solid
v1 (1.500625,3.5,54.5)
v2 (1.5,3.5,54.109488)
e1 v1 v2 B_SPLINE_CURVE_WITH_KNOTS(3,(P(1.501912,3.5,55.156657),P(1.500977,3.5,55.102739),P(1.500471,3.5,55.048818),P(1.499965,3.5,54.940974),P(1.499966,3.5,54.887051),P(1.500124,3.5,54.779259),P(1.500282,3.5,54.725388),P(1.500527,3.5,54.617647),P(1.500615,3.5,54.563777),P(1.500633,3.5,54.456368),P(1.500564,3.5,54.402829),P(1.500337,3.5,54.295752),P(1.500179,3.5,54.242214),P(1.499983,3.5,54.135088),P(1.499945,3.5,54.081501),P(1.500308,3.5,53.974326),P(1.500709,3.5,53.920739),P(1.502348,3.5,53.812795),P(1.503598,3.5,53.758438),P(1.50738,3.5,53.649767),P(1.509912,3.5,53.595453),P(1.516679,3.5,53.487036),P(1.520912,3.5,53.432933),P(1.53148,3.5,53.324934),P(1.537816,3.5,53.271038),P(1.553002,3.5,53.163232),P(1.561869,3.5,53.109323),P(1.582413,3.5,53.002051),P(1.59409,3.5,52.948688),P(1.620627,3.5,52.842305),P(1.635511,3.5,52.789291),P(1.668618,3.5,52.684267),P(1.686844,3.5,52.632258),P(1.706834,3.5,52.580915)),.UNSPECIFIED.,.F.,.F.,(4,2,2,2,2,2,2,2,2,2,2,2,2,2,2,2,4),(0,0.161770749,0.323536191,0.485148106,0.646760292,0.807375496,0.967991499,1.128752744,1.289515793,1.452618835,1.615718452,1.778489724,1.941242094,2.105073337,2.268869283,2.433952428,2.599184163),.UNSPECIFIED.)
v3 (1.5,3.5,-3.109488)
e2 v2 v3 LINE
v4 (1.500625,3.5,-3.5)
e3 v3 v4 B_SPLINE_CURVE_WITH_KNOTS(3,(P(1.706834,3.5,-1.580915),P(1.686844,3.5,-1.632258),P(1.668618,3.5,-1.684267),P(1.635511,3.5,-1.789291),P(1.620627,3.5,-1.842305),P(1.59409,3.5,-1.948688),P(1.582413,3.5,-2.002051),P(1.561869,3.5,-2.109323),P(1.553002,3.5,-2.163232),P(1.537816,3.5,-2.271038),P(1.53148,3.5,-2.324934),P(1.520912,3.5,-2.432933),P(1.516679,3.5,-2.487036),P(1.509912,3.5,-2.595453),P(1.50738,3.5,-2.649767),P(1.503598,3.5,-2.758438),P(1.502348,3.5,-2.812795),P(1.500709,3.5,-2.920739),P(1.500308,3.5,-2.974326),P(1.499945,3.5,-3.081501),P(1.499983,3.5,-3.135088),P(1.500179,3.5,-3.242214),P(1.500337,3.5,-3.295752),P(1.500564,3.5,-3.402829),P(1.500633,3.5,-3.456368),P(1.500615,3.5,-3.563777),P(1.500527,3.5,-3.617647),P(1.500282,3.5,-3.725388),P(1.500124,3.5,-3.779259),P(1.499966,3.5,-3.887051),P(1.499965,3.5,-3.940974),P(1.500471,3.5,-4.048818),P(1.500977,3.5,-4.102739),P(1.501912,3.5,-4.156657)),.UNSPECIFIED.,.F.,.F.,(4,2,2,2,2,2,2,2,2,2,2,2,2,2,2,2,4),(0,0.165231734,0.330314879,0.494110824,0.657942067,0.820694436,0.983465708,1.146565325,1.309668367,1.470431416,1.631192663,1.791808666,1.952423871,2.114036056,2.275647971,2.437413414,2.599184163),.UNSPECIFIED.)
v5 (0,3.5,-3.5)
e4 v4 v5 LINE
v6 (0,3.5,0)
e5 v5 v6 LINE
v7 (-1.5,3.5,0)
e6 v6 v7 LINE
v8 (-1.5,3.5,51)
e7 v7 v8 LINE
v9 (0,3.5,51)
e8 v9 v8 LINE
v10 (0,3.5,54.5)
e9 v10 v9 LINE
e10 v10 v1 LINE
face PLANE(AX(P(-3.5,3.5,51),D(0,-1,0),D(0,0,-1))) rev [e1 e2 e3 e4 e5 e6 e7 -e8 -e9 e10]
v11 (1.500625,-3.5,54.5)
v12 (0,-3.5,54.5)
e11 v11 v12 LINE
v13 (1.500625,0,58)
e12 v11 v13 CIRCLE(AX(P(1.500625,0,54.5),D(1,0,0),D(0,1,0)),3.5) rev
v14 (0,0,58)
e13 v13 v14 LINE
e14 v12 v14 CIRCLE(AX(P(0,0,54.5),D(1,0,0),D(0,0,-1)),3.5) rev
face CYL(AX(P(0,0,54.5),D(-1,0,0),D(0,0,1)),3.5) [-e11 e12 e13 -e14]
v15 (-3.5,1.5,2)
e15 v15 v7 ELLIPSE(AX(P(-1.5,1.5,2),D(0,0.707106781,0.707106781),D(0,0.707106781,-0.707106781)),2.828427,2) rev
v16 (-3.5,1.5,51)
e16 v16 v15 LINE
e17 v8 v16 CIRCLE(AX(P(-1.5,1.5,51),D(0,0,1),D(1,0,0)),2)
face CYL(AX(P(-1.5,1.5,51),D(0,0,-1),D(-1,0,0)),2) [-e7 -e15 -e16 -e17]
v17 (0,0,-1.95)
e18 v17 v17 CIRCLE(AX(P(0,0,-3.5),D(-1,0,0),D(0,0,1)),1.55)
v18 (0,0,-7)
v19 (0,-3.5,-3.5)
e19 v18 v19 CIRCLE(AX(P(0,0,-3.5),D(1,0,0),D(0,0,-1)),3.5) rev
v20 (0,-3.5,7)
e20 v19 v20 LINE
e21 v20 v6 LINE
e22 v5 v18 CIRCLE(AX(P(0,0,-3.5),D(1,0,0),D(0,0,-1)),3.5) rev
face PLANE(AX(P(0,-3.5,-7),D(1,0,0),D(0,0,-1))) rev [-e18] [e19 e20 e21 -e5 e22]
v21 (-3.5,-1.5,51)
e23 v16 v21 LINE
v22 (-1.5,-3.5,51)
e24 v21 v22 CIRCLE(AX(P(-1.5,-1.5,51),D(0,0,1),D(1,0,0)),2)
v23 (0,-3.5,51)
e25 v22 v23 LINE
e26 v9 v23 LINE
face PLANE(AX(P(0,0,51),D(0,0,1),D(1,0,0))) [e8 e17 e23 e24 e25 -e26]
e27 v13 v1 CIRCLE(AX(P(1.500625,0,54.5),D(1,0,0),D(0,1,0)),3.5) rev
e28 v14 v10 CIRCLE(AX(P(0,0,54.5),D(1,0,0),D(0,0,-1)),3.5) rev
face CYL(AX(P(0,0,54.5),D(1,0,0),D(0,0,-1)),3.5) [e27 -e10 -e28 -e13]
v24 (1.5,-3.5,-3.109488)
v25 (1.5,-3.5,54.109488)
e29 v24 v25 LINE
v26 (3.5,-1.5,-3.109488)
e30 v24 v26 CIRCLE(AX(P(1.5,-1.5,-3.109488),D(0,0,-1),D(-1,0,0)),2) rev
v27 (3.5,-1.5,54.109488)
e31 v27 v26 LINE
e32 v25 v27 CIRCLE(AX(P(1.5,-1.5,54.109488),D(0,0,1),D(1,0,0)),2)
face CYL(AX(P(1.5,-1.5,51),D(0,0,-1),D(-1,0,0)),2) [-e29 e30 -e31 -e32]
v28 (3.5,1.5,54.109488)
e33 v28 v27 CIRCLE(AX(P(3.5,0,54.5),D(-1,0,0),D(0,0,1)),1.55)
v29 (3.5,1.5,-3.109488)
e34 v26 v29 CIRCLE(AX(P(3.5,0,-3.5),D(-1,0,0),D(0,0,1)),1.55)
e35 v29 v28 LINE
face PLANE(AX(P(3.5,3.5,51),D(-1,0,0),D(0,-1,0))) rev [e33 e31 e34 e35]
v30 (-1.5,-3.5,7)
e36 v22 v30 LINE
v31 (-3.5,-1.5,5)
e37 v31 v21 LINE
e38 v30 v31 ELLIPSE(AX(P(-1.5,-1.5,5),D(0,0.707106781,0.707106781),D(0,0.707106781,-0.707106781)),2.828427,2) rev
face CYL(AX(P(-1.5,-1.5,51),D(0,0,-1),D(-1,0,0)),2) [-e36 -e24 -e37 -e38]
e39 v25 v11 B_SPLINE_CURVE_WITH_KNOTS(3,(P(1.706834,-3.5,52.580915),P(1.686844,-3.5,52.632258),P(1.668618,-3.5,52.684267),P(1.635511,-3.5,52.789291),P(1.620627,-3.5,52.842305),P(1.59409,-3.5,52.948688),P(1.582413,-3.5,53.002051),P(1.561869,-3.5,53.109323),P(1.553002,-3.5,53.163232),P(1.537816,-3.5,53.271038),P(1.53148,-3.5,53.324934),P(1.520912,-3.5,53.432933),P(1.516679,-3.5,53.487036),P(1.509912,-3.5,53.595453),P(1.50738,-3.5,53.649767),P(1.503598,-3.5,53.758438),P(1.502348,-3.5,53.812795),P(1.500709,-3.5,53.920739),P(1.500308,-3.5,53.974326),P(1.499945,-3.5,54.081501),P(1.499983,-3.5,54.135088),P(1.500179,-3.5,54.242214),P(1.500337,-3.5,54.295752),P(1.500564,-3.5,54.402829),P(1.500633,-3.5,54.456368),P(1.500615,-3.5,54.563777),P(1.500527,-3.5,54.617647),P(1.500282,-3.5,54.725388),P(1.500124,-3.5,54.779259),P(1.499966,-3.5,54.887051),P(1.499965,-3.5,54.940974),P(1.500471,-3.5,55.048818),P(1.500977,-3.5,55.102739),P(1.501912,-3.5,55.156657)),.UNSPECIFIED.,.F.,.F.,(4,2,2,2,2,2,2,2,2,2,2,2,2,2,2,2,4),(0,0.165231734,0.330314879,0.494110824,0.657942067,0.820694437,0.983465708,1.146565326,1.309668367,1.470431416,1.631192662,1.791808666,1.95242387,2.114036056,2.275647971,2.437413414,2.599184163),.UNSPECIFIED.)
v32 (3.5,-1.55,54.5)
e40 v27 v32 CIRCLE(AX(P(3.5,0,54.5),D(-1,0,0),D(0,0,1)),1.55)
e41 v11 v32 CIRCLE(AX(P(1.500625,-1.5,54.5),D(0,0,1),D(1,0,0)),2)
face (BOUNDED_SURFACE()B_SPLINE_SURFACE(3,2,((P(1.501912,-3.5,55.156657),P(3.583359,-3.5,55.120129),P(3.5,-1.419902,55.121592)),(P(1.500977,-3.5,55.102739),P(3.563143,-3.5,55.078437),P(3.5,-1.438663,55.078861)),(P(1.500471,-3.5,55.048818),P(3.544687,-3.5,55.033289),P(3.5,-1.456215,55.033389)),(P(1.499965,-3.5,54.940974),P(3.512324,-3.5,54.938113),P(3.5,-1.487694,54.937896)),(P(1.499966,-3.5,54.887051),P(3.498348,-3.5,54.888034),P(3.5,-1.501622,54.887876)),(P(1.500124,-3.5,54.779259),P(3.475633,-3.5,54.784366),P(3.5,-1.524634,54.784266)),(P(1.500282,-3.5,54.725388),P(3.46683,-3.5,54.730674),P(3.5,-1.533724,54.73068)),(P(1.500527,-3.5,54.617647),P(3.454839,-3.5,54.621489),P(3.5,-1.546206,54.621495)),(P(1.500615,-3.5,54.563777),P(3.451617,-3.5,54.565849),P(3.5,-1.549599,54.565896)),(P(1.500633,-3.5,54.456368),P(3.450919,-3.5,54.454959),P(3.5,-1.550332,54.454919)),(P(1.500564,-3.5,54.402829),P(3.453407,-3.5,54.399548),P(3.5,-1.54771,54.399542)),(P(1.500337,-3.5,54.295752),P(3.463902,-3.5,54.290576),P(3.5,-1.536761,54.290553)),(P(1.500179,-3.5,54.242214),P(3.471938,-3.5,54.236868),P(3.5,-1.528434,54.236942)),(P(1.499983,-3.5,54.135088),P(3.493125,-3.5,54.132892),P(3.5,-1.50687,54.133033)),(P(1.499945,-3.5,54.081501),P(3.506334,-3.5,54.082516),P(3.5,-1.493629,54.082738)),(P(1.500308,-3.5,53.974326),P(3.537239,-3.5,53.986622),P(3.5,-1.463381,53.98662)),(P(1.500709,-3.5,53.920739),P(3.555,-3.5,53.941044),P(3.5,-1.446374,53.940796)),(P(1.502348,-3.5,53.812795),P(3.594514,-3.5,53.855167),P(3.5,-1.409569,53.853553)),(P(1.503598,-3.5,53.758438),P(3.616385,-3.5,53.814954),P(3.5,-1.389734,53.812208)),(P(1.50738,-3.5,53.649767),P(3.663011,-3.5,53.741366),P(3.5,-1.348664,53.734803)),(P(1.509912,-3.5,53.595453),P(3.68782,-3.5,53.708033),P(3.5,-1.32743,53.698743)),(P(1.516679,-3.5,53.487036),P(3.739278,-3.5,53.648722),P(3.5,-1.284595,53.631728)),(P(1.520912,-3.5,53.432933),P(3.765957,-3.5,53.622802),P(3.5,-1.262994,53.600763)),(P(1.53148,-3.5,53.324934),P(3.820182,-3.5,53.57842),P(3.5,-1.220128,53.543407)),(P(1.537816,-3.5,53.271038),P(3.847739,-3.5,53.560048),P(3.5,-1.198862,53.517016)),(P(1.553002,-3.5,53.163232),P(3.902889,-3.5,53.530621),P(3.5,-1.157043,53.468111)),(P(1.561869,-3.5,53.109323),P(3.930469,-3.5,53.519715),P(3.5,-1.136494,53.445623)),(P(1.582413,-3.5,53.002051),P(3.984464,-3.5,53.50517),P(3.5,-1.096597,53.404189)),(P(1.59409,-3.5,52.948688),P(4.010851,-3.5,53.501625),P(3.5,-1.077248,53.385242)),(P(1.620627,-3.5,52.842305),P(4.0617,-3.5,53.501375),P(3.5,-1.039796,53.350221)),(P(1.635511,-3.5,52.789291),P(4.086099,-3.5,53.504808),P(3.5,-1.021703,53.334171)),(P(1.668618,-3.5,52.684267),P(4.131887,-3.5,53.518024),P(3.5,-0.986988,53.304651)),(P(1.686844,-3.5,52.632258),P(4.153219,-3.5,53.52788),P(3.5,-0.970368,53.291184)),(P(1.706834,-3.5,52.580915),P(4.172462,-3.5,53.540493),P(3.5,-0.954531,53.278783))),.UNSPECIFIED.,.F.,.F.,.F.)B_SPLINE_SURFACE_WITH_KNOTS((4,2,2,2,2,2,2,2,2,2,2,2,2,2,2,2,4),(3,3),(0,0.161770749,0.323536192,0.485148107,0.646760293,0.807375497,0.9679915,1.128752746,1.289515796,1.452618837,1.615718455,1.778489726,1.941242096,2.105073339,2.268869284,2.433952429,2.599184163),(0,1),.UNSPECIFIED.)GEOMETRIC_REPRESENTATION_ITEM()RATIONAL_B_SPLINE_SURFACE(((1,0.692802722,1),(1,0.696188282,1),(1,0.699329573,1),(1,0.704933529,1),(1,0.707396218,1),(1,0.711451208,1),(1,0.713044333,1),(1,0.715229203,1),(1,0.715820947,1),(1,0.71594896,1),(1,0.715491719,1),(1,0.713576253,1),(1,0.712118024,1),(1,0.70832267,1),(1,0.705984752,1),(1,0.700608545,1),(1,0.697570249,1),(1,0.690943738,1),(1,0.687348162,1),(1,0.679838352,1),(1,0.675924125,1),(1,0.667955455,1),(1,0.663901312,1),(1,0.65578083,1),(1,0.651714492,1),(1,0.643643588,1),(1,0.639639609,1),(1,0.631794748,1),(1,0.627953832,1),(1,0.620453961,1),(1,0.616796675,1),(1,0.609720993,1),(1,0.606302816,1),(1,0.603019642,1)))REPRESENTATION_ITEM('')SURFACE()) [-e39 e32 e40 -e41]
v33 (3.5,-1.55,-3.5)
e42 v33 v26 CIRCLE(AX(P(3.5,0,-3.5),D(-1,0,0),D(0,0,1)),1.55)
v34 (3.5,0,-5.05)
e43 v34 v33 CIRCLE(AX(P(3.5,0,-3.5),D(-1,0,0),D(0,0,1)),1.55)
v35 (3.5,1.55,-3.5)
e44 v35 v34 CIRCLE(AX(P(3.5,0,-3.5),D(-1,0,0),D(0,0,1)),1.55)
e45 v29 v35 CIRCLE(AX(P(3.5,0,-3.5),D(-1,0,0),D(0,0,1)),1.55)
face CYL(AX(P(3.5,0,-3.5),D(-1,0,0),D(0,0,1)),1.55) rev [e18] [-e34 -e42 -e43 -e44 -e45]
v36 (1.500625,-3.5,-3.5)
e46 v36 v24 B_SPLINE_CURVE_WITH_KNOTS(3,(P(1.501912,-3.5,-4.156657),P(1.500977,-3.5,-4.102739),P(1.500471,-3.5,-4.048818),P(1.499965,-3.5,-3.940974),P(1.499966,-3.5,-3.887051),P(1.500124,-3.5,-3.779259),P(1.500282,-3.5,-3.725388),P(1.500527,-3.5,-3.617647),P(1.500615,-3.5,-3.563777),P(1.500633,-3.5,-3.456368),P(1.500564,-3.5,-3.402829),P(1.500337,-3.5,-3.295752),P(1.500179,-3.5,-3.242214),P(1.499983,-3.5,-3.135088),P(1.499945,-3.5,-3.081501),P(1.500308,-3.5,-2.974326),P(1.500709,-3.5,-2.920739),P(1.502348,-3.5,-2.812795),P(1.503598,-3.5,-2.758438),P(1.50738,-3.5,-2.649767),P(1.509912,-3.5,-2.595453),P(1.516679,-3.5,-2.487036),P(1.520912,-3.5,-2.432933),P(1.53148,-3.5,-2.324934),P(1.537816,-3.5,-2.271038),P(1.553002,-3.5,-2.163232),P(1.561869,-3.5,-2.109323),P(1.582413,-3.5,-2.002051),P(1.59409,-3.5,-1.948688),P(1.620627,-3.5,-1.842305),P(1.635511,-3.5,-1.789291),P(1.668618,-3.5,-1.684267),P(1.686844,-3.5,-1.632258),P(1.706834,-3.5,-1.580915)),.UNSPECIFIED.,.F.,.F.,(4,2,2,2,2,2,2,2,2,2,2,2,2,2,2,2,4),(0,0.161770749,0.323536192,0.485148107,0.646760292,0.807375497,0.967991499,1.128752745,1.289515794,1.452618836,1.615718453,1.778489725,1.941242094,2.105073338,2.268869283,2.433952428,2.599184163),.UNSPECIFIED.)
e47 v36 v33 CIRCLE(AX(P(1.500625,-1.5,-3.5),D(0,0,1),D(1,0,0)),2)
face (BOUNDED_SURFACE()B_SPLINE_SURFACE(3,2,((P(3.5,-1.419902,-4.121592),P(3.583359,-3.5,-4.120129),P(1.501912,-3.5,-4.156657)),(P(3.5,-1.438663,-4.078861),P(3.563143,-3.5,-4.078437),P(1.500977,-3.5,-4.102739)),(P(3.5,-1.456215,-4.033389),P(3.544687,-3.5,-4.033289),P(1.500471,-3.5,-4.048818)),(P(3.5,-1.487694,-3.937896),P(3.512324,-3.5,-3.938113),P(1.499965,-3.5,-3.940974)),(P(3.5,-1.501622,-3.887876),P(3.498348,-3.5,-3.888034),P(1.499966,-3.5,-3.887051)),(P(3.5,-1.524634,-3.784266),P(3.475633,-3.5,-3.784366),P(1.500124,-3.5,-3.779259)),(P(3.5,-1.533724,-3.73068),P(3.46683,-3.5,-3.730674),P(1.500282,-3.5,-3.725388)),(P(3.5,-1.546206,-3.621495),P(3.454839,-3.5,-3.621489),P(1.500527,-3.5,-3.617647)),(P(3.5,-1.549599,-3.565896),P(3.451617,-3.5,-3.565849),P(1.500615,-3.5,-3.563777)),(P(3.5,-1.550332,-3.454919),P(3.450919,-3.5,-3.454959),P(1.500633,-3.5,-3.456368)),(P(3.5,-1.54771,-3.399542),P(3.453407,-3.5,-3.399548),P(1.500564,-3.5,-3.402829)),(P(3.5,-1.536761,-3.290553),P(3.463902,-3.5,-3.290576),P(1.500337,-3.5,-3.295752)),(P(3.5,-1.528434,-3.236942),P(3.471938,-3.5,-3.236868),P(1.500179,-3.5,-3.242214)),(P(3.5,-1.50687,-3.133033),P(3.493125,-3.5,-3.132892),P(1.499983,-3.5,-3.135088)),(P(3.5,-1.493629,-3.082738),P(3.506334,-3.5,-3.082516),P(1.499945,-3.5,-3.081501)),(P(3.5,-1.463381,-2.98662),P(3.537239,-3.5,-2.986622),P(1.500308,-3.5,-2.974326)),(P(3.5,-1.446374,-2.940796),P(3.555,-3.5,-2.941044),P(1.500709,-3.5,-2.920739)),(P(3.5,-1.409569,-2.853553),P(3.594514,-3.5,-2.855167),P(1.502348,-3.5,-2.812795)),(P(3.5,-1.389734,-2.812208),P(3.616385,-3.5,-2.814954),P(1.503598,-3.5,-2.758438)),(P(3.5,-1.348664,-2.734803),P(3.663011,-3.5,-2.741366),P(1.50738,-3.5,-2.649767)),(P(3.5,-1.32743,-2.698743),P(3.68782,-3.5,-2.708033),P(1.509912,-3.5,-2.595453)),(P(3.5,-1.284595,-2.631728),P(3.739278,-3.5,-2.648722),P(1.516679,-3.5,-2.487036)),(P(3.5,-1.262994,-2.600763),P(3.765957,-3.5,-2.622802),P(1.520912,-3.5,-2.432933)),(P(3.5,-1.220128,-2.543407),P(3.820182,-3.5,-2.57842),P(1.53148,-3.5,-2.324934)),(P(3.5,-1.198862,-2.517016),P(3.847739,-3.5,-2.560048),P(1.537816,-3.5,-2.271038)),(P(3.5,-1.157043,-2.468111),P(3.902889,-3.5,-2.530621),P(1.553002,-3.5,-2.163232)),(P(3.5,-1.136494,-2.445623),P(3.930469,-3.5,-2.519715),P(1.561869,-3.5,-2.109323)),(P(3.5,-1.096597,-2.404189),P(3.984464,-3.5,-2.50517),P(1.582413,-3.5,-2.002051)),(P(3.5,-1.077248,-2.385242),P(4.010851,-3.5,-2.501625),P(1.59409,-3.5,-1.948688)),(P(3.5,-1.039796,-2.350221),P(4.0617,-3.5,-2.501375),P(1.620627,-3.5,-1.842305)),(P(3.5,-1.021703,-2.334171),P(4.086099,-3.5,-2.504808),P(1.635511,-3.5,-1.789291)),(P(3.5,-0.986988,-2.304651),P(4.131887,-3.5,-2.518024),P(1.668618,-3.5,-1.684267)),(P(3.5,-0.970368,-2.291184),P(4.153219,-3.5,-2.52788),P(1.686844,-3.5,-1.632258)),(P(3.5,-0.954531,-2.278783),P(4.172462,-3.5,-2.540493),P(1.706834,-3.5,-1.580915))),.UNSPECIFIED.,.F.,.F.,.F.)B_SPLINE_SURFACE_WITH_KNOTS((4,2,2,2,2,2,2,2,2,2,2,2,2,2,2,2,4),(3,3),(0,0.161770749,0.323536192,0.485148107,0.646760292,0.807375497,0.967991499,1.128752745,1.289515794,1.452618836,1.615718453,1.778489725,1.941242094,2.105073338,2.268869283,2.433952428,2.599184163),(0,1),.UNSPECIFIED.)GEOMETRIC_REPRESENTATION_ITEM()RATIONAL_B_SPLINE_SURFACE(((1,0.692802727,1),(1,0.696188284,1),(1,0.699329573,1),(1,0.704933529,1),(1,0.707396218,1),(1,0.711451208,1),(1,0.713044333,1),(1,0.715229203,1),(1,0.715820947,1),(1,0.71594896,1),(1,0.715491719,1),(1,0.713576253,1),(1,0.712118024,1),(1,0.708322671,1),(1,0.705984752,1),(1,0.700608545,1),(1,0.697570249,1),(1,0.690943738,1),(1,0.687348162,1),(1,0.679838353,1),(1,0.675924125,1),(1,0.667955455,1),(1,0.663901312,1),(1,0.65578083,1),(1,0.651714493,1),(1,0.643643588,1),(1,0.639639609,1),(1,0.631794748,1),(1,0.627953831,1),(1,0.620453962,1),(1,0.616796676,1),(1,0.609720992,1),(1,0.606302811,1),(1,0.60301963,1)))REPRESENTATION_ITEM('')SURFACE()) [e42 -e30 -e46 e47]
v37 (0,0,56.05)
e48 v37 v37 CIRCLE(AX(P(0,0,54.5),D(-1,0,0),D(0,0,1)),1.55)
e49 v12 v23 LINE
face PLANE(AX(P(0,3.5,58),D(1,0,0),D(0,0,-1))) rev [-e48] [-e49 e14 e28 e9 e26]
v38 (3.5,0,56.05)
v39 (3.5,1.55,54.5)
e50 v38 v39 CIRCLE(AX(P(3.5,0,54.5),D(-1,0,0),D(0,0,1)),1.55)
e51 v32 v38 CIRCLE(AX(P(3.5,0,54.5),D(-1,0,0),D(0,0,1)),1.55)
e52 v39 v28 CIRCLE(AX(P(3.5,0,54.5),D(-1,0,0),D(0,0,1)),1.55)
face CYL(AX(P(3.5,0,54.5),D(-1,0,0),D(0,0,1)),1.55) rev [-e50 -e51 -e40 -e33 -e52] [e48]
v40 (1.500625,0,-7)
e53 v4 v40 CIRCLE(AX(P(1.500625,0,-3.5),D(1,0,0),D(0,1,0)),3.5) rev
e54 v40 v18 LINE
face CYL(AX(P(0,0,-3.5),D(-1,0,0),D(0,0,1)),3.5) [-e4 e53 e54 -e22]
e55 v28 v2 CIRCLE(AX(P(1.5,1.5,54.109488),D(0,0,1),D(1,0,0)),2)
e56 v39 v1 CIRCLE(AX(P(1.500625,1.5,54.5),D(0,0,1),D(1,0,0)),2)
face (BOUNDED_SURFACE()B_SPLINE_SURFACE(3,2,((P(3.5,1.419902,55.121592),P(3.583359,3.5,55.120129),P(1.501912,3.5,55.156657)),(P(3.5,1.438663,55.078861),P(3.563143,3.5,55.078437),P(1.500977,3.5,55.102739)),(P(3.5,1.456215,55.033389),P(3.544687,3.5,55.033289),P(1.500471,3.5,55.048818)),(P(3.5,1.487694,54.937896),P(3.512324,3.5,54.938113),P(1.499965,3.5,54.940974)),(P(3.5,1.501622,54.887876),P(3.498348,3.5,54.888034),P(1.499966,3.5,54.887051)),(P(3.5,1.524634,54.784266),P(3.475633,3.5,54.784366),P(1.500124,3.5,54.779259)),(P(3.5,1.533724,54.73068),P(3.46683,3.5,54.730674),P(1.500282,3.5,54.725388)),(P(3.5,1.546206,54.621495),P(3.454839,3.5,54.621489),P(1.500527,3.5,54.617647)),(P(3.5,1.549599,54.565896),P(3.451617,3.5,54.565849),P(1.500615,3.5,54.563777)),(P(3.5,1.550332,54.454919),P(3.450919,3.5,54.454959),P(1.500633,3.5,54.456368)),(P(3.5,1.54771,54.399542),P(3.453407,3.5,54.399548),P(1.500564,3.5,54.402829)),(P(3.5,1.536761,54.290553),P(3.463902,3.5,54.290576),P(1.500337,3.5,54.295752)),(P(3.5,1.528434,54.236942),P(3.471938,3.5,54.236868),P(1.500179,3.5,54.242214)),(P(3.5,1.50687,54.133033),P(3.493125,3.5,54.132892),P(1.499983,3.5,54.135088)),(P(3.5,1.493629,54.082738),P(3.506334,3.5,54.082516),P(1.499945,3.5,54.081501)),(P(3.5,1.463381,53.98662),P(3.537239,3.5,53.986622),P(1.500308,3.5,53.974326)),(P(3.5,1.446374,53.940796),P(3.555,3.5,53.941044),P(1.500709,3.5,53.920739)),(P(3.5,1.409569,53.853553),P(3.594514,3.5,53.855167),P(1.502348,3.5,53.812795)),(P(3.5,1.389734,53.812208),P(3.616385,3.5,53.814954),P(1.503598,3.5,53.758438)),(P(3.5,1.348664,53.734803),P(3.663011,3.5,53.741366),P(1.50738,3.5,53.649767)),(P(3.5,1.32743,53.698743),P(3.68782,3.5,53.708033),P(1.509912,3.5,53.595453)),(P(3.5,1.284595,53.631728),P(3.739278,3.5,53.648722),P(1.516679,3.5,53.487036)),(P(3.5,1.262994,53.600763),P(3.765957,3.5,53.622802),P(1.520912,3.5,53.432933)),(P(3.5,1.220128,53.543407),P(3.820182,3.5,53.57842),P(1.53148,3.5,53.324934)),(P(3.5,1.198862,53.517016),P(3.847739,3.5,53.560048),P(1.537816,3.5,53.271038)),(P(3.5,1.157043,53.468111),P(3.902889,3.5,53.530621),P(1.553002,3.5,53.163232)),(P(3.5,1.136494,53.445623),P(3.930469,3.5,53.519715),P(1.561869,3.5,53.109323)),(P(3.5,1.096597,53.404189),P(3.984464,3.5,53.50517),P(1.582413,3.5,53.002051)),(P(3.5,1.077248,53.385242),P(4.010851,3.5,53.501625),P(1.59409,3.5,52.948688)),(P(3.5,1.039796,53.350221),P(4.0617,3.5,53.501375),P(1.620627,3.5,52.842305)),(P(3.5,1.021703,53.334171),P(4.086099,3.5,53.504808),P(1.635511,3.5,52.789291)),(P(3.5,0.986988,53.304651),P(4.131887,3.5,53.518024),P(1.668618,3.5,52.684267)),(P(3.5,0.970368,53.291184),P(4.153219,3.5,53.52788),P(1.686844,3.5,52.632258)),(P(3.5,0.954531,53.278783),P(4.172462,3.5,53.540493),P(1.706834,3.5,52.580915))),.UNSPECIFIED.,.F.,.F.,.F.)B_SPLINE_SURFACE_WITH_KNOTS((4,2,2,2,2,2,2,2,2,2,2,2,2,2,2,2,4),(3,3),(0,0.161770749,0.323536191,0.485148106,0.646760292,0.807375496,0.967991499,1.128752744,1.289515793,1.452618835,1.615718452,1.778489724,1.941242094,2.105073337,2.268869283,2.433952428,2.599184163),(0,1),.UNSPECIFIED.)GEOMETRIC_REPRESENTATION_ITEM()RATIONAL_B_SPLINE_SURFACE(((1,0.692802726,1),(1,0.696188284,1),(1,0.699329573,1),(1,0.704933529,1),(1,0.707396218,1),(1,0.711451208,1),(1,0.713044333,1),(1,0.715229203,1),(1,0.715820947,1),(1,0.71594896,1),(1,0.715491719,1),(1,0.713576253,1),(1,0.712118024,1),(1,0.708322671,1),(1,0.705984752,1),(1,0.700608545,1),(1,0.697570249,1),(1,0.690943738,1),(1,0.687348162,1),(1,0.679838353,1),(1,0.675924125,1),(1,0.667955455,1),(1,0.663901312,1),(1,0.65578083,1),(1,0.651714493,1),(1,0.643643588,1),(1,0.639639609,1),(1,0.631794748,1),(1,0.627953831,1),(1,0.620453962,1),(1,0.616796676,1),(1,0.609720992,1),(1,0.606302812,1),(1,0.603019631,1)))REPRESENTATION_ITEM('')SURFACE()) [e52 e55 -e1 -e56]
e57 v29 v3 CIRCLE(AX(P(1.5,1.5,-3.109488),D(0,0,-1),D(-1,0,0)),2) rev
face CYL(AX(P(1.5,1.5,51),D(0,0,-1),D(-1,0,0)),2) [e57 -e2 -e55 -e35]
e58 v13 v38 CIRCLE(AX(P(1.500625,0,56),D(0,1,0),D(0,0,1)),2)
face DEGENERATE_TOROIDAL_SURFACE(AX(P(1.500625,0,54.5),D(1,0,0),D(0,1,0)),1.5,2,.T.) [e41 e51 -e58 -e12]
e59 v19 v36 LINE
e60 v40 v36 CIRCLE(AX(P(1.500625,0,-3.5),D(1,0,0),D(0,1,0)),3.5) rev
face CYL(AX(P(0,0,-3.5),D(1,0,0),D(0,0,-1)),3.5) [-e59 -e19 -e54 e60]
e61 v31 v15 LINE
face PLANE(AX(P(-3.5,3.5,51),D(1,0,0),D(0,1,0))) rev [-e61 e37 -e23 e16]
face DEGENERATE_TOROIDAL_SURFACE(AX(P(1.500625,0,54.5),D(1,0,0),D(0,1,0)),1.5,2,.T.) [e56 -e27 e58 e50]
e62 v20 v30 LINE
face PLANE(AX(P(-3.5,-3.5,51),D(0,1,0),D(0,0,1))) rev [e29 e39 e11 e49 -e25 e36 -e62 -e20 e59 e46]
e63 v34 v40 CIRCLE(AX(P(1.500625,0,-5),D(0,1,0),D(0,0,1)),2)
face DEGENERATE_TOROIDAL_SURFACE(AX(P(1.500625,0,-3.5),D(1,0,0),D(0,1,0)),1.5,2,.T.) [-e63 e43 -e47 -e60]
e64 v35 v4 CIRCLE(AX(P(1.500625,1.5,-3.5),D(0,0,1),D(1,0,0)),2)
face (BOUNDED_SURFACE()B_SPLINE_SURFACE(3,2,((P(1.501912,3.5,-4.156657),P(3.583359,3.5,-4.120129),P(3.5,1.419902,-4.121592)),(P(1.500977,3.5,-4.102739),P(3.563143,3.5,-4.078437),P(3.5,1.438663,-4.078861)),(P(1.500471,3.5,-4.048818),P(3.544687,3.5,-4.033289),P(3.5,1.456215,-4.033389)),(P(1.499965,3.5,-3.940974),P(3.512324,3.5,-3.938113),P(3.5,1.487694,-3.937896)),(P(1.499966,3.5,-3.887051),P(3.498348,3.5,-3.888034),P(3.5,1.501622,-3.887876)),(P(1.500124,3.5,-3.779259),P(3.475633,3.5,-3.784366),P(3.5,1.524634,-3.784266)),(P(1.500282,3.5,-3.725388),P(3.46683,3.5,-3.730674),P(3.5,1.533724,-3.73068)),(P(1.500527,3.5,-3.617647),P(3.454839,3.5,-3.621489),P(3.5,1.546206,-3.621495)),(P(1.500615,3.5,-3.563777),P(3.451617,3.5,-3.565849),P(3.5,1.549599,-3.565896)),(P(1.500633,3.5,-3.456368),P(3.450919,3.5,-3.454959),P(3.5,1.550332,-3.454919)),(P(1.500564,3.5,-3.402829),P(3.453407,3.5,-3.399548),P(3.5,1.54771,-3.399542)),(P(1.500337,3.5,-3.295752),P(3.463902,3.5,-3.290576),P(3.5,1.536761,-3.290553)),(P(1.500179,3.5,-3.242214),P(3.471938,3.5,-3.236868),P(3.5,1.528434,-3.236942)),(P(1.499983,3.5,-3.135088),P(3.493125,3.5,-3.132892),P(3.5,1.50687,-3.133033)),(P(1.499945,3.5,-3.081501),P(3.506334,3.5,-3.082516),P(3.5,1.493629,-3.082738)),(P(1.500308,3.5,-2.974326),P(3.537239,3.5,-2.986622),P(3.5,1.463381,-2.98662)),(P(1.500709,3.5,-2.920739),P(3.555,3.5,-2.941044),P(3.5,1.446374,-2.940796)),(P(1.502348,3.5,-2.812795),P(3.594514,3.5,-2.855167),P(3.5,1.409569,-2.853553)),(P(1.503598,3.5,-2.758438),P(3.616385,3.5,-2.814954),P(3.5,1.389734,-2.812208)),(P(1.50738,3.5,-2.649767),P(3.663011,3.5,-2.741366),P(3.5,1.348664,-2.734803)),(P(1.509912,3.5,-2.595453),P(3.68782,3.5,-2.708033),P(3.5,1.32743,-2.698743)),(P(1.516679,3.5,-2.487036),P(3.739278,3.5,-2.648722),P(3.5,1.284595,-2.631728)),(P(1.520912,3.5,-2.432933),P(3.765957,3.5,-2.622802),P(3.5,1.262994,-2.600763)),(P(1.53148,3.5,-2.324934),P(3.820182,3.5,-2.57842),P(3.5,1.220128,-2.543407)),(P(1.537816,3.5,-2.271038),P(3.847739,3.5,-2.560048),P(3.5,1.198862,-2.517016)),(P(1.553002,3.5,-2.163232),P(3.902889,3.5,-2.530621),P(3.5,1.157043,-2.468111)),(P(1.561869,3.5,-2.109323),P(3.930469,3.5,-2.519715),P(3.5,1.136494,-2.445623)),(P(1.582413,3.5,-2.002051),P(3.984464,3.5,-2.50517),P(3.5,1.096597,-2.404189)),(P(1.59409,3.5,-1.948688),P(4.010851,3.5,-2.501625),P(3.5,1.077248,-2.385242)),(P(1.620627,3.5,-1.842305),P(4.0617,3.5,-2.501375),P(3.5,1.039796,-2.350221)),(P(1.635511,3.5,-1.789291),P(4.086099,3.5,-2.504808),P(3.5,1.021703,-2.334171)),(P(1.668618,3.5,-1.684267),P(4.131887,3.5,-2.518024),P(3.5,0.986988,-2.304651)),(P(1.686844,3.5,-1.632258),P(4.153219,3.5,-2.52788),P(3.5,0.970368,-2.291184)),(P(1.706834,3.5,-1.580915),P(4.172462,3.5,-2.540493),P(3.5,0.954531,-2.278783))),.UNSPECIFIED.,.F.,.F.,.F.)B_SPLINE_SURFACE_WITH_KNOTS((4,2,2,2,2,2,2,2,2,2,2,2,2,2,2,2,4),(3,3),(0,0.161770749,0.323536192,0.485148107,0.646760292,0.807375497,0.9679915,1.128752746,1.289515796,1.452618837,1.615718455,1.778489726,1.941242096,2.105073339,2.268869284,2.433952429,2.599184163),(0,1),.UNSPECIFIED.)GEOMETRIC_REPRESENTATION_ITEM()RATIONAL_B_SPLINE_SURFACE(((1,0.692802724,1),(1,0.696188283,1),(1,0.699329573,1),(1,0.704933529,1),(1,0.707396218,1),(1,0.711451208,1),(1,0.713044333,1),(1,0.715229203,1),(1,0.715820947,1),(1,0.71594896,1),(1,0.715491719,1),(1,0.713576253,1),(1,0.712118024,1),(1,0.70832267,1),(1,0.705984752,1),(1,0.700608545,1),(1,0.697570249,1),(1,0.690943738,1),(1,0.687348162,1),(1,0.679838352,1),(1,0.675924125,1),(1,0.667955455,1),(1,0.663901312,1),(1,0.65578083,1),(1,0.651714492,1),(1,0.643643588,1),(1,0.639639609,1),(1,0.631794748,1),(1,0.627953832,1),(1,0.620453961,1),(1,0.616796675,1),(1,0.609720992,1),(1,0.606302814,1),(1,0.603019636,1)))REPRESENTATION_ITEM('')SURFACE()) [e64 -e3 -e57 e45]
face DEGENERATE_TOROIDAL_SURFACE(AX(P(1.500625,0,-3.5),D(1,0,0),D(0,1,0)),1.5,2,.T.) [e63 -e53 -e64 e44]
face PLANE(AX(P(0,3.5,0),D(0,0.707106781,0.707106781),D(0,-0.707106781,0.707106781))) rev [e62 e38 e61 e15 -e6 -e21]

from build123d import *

# Parameters (mm, degrees)
SKETCH_1_W          = 7
SKETCH_1_H          = 7
EXTRUDE_1_DEPTH     = 51
SKETCH_2_W          = 3.5
SKETCH_2_H          = 7
EXTRUDE_2_DEPTH     = 7
SKETCH_3_W          = 3.5
SKETCH_3_H          = 7
EXTRUDE_3_DEPTH     = 7
FILLET_1_R          = 3.5
SKETCH_4_R          = 1.55
CUT_EXTRUDE_1_DEPTH = 3.5
CUT_EXTRUDE_2_DEPTH = 3.5
FILLET_2_R          = 2


with BuildPart() as part:
    # 草图1 → 凸台-拉伸1 (new body)
    with BuildSketch(Plane.XY):
        Rectangle(SKETCH_1_W, SKETCH_1_H)
    extrude(amount=EXTRUDE_1_DEPTH)

    # 草图2 → 凸台-拉伸2 (add)
    with BuildSketch(Plane.XY.offset(51)):
        with Locations((1.75, 0)):
            Rectangle(SKETCH_2_W, SKETCH_2_H)
    extrude(amount=EXTRUDE_2_DEPTH)

    # 草图3 → 凸台-拉伸3 (add)
    with BuildSketch(Plane(origin=(0, 0, 0), x_dir=(-1, 0, 0), z_dir=(0, 0, -1))):
        with Locations((-1.75, 0)):
            Rectangle(SKETCH_3_W, SKETCH_3_H)
    extrude(amount=EXTRUDE_3_DEPTH)

    # 圆角1
    fillet_1_edges = [part.edges().sort_by_distance(p)[0] for p in [
        (1.75, -3.5, 58),
        (1.75, 3.5, 58),
        (1.75, 3.5, -7),
        (1.75, -3.5, -7),
    ]]
    fillet(fillet_1_edges, radius=FILLET_1_R - 0.0001)  # a hair under: the kernel refuses the full size

    # 草图4 → 切除-拉伸1 (cut)
    with BuildSketch(Plane.ZY):
        with Locations((54.5, 0)):
            Circle(SKETCH_4_R)
        with Locations((-3.5, 0)):
            Circle(SKETCH_4_R)
    extrude(amount=-CUT_EXTRUDE_1_DEPTH, mode=Mode.SUBTRACT)

    # 草图5 → 切除-拉伸2 (cut)
    with BuildSketch(Plane.ZY.offset(3.5)):
        Polygon((0, 3.5), (7, -3.5), (0, -3.5), align=None)
    extrude(amount=-CUT_EXTRUDE_2_DEPTH, mode=Mode.SUBTRACT)

    # 圆角2
    fillet_2_edges = [part.edges().sort_by_distance(p)[0] for p in [
        (3.5, -3.5, 25.5),
        (-3.5, -3.5, 29),
        (3.5, 3.5, 25.5),
        (-3.5, 3.5, 25.5),
    ]]
    fillet(fillet_2_edges, radius=FILLET_2_R)


solid = part.part
